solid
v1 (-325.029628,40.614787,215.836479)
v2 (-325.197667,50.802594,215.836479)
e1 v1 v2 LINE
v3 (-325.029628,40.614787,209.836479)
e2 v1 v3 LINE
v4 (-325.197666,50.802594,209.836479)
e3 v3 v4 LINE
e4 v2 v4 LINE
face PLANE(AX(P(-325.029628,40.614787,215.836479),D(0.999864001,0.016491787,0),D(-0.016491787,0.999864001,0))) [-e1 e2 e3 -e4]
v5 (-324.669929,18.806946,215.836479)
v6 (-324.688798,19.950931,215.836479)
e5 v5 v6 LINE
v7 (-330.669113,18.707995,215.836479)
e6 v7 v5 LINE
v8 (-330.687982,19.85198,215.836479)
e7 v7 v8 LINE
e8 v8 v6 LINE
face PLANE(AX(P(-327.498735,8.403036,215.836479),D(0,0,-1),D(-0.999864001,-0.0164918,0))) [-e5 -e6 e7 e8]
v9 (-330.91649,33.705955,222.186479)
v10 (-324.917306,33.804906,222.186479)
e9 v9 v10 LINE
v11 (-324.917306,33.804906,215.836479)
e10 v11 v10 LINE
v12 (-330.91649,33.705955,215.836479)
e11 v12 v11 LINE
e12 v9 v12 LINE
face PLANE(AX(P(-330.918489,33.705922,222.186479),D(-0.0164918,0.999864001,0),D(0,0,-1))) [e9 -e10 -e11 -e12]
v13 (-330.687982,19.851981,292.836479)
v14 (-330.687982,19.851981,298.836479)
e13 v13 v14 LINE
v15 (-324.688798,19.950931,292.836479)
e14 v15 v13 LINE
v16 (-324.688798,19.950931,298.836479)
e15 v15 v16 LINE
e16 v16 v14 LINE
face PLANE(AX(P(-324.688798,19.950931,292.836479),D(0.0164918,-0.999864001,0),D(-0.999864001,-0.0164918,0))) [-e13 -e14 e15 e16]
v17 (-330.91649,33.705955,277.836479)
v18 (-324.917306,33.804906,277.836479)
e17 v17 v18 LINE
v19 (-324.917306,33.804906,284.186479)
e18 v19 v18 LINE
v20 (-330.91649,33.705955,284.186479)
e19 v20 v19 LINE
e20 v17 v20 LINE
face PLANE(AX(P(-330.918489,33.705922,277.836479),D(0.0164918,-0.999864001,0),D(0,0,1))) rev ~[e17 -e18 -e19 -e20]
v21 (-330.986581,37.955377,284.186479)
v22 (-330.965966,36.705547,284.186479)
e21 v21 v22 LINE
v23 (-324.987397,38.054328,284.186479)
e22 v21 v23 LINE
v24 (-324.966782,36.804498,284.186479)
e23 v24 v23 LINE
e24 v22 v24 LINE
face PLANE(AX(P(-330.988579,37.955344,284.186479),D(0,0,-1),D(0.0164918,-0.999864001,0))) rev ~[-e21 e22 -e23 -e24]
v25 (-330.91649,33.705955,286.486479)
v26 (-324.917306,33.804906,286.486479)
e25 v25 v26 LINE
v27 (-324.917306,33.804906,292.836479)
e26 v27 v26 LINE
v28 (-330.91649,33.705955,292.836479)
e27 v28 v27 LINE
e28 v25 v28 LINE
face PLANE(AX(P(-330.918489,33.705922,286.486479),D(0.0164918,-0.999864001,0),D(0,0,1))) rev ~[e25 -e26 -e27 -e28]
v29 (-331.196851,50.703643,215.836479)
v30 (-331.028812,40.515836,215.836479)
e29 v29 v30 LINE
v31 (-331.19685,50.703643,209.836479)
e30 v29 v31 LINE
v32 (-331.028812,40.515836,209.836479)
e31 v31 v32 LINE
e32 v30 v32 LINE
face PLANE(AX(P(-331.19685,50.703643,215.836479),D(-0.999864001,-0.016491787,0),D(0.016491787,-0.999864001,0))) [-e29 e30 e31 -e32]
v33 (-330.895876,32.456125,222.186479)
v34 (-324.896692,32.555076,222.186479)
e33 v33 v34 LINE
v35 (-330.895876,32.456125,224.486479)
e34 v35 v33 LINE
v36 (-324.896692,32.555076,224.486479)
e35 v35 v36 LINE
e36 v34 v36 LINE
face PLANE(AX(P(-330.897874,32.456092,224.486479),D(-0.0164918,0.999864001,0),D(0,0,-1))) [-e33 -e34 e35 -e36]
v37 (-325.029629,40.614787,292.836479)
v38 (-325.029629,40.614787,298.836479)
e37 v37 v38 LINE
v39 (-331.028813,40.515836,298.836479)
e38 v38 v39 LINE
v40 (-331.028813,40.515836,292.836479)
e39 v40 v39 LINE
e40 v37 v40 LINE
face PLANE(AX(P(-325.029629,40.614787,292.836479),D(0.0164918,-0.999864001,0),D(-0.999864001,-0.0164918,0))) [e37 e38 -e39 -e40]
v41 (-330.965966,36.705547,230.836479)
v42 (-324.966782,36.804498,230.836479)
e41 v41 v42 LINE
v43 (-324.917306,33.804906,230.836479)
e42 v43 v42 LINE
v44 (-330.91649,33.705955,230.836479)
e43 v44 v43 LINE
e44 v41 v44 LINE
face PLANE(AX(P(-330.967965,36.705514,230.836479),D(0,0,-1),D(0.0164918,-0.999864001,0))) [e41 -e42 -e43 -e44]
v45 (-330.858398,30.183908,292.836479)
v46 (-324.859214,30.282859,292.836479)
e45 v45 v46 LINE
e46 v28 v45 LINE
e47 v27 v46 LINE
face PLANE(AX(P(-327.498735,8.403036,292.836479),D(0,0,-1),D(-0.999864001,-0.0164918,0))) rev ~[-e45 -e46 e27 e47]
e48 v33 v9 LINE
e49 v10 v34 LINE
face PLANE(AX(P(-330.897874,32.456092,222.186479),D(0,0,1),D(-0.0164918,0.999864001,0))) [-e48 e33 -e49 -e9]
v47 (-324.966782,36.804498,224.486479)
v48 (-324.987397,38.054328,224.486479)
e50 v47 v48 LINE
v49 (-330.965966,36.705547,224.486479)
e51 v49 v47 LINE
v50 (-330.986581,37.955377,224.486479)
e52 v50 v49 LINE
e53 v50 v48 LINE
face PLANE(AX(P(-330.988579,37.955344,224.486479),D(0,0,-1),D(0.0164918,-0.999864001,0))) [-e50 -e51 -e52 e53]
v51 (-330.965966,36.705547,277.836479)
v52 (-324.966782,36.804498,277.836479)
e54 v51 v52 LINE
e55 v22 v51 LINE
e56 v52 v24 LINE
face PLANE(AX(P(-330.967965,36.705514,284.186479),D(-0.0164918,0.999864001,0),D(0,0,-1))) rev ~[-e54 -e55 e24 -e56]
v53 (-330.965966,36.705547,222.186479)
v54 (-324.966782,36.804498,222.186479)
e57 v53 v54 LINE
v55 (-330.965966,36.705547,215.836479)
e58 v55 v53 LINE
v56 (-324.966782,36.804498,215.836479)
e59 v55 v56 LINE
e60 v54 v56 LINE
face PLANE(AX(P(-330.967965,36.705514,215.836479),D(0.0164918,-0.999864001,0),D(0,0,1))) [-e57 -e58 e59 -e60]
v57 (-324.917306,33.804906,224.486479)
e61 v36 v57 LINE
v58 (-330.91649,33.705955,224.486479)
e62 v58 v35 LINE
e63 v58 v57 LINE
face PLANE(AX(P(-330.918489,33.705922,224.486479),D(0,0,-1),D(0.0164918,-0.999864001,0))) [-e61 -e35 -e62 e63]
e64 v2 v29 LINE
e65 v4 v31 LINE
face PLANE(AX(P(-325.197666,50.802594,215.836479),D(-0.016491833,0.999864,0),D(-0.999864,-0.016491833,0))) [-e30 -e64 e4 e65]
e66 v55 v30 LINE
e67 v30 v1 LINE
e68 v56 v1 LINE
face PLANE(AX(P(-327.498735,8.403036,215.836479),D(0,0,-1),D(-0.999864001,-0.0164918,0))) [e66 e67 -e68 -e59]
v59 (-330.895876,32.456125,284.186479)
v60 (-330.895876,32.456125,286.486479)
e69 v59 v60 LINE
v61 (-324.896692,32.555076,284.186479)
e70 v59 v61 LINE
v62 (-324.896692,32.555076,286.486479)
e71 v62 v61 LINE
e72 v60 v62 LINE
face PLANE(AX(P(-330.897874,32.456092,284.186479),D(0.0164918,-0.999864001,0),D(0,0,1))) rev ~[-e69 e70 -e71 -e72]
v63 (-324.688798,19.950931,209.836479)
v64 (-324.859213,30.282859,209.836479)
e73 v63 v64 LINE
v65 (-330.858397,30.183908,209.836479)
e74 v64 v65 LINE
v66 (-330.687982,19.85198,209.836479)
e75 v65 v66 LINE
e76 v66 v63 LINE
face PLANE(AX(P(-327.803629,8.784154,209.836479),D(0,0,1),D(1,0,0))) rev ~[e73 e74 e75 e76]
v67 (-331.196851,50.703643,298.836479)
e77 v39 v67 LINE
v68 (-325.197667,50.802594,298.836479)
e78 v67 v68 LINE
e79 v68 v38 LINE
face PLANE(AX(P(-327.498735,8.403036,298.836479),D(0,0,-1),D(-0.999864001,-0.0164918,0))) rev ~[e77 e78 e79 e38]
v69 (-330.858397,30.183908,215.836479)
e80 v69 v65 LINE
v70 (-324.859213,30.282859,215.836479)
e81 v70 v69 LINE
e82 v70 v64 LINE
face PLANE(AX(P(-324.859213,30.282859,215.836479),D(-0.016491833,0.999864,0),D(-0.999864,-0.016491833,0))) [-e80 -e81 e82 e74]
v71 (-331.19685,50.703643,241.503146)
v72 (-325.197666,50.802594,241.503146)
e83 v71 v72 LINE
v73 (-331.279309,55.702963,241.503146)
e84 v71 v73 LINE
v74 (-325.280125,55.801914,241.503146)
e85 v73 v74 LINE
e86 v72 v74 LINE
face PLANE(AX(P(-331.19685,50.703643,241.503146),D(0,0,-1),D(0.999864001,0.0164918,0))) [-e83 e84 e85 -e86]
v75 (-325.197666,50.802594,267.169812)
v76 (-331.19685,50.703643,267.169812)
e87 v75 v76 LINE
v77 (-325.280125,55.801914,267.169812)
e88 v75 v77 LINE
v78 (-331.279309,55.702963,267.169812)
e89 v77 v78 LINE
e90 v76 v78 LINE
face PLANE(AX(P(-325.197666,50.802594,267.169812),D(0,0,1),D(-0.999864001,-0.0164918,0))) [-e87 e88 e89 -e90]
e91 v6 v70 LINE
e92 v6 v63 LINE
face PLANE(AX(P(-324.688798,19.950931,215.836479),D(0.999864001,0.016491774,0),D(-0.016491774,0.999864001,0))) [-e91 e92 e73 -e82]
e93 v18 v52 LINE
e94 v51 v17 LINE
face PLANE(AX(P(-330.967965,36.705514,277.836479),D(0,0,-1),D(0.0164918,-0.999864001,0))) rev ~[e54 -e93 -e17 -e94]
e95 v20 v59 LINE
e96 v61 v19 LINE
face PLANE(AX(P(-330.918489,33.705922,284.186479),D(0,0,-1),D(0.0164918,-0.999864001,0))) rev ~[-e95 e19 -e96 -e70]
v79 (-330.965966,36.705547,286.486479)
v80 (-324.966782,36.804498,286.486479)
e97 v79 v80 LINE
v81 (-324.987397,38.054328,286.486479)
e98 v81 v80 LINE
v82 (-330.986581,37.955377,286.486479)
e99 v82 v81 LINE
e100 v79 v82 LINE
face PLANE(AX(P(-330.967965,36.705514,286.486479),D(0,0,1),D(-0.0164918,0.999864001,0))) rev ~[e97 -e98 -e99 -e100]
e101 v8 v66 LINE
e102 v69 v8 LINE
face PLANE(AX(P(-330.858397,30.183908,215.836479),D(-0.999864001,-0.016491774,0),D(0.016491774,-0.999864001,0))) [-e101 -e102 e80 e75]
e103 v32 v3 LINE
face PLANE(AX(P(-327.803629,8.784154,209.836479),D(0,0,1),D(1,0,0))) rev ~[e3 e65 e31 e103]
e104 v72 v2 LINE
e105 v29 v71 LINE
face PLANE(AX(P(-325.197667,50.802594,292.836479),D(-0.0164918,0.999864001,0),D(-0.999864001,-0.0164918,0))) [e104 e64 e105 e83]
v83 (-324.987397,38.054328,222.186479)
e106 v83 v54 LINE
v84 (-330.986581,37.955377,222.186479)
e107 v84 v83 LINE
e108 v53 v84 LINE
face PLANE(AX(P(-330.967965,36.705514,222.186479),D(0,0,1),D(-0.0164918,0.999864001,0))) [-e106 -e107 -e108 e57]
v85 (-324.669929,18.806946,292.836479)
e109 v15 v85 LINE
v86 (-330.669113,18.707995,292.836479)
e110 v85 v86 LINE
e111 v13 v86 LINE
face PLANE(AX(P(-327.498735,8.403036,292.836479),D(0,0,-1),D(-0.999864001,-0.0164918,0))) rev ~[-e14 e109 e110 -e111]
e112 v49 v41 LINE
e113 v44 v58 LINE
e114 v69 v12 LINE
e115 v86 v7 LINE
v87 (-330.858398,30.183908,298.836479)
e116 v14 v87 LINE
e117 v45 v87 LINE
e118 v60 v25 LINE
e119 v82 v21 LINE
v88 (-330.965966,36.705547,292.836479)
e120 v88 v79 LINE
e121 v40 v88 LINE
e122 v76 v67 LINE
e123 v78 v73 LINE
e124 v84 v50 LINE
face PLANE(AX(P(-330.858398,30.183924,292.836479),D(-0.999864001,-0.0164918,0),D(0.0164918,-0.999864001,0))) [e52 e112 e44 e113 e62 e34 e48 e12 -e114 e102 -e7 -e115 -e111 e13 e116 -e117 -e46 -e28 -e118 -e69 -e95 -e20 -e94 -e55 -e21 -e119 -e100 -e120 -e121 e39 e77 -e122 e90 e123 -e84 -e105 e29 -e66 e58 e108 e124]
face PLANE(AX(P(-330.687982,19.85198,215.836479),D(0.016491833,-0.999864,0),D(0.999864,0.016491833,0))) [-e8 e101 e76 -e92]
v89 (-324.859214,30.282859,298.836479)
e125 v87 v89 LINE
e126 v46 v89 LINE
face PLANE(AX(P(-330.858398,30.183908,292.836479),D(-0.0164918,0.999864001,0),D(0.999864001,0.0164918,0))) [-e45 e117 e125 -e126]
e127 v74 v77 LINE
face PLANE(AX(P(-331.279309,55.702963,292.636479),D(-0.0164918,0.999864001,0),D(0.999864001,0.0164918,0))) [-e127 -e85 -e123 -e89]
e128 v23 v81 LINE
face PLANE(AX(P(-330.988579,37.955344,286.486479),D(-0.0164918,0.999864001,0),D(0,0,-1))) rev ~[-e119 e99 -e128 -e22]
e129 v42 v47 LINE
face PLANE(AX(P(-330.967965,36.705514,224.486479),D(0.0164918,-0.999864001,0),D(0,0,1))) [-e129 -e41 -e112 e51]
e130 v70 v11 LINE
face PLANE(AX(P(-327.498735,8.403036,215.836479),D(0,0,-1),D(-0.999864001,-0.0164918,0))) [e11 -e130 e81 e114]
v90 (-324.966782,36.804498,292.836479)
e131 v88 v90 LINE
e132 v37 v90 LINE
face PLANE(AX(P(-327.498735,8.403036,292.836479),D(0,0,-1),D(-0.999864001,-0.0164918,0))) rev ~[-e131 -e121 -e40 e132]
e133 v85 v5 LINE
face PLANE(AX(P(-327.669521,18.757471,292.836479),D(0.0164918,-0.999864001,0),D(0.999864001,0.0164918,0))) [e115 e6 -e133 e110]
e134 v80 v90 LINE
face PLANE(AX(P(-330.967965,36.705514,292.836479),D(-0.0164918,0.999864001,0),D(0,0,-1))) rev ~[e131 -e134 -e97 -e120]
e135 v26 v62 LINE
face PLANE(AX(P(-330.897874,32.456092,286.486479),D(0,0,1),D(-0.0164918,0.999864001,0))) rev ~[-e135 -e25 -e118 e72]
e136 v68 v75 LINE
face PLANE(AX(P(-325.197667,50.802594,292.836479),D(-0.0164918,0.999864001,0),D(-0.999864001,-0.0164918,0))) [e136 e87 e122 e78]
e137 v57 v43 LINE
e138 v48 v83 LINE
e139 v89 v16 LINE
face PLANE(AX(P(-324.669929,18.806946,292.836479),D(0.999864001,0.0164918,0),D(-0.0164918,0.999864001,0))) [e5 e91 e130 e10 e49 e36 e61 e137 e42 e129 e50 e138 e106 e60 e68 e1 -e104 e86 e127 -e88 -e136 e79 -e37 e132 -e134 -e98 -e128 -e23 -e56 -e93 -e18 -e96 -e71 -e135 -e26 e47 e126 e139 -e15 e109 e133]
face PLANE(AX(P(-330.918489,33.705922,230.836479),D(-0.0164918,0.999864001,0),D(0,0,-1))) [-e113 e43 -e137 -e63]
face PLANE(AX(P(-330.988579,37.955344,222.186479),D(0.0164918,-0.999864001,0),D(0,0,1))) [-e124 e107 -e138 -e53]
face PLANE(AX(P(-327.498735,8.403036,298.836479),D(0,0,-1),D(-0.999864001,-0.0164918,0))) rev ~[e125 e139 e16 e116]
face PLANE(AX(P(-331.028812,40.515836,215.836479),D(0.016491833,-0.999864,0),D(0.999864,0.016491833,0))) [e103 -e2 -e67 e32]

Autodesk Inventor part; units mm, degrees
ref_plane "РабПлоскость1" through (-327.803629, 8.784154, 215.836479) normal (0, 0, 1) x (1, 0, 0)
sketch "Эскиз1" plane through (-327.803629, 8.784154, 215.836479) normal (0, 0, 1) x (1, 0, 0)
  line L0 (3.114831, 11.166777) -> (2.944416, 21.498705)
  line L1 (2.944416, 21.498705) -> (-3.054768, 21.399754)
  line L2 (-3.054768, 21.399754) -> (-2.884353, 11.067826)
  line L3 (-2.884353, 11.067826) -> (3.114831, 11.166777)
  line L4 (-3.393221, 41.919489) -> (-3.225183, 31.731682)
  line L5 (2.774001, 31.830633) -> (2.605963, 42.01844)
  line L6 (-3.225183, 31.731682) -> (2.774001, 31.830633)
  line L7 (2.605963, 42.01844) -> (-3.393221, 41.919489)
  line L8 (2.774001, 31.830633) -> (2.605963, 42.01844) construction
  line L9 (-3.393221, 41.919489) -> (-3.225183, 31.731682) construction
  line L10 (3.114831, 11.166777) -> (2.944416, 21.498705) construction
  line L11 (-3.054768, 21.399754) -> (-2.884353, 11.067826) construction
  line L12 (6.149374, 48.077701) -> (19.433282, 48.296806) construction
  line L13 (2.605963, 42.01844) -> (6.248325, 42.078517) construction
  point P0 (327.803629, -8.784154)
  dimension "d16" = 6
extrude "Выдавливание1" add sketch "Эскиз1" against normal blind 6
ref_plane "РабПлоскость2" through (-327.498735, 8.403036, 292.836479) normal (0, 0, -1) x (-0.999864, -0.0164918, 0)
sketch "Эскиз2" plane through (-327.498735, 8.403036, 292.836479) normal (0, 0, -1) x (-0.999864, -0.0164918, 0)
  line L0 (-3, 21.833317) -> (3, 21.833317)
  line L1 (3, 21.833317) -> (3, 11.499984)
  line L2 (3, 11.5) -> (-3, 11.5)
  line L3 (-3, 11.499984) -> (-3, 21.833317)
  line L4 (3, 32.16665) -> (-3, 32.16665)
  line L5 (-3, 32.16665) -> (-3, 42.355843)
  line L6 (-3, 42.5) -> (3, 42.5)
  line L7 (3, 42.355843) -> (3, 32.16665)
  line L8 (-3, 11.499984) -> (-3, 21.833317) construction
  line L9 (3, 21.833317) -> (3, 11.499984) construction
  line L10 (-3, 32.16665) -> (-3, 42.355843) construction
  line L11 (3, 42.355843) -> (3, 32.16665) construction
  point P0 (-327.315615, -13.802923)
sketch "Эскиз2 outline for Выдавливание2" plane through (-327.498735, 8.403036, 292.836479) normal (0, 0, -1) x (-0.999864, -0.0164918, 0)
  line L0 (3, 32.16665) -> (3, 42.355843)
  line L1 (-3, 32.16665) -> (3, 32.16665)
  line L2 (-3, 42.355843) -> (-3, 32.16665)
  line L3 (3, 42.355843) -> (-3, 42.355843)
  line L4 (-3, 21.833317) -> (-3, 11.499984)
  line L5 (3, 21.833317) -> (-3, 21.833317)
  line L6 (3, 11.499984) -> (3, 21.833317)
  line L7 (-3, 11.499984) -> (3, 11.499984)
extrude "Выдавливание2" add sketch "Эскиз2 outline for Выдавливание2" against normal blind 6
sketch "Эскиз3" plane through (-327.498735, 8.403036, 292.836479) normal (0, 0, -1) x (-0.999864, -0.0164918, 0)
  circle A0 centre (0, -7.644157) radius 18
  line L0 (6.642857, 42.355843) -> (3, 42.355843)
  line L1 (-3, 32.166667) -> (-3, 21.833333)
  line L2 (-3, 21.833333) -> (3, 21.833333)
  line L3 (3, 21.833333) -> (3, 32.166667)
  line L4 (3, 32.166667) -> (-3, 32.166667)
  line L5 (-3, 42.355843) -> (3, 42.355843)
  line L6 (3, 42.355843) -> (3, 10.355843)
  line L7 (3, 10.355843) -> (-3, 10.355843)
  line L8 (-3, 10.355843) -> (-3, 42.355843)
  point P0 (-327.315615, -13.802923)
  point P1 (-3, 21.833333)
  point P2 (3, 21.833333)
  point P3 (3, 42.355843)
extrude "Выдавливание3" add sketch "Эскиз3" along normal up to surface (77 mm away) contours L7 L8 L2 L6 | L2 L1 L4 L3 | L4 L8 L5 L6
sketch "Эскиз4" plane through (-331.19685, 50.703643, 209.836479) normal (-0.999864, -0.0164918, 0) x (0, 0, 1)
  line L0 (0, -14) -> (6, -14) construction
  line L1 (0, -17) -> (6, -17) construction
  line L2 (6, -17) -> (6, -14)
  line L3 (6, -14) -> (12.35, -14)
  line L4 (12.35, -14) -> (12.35, -12.75)
  line L5 (12.35, -12.75) -> (14.65, -12.75)
  line L6 (14.65, -12.75) -> (14.65, -14)
  line L7 (14.65, -14) -> (21, -14)
  line L8 (21, -14) -> (21, -17)
  line L9 (21, -17) -> (14.65, -17)
  line L10 (14.65, -17) -> (14.65, -18.25)
  line L11 (14.65, -18.25) -> (12.35, -18.25)
  line L12 (12.35, -18.25) -> (12.35, -17)
  line L13 (12.35, -17) -> (6, -17)
  line L14 (0, -20.522506) -> (0, -30.855843) construction
  line L15 (89, -10.189193) -> (89, 0) construction
  line L16 (0, -30.855843) -> (89, 0) construction
  line L17 (44.5, 0) -> (44.5, -30.855843) construction
  line L18 (89, -14) -> (83, -14) construction
  line L19 (89, -17) -> (83, -17) construction
  line L20 (83, -17) -> (83, -14)
  line L21 (83, -14) -> (76.65, -14)
  line L22 (76.65, -14) -> (76.65, -12.75)
  line L23 (76.65, -12.75) -> (74.35, -12.75)
  line L24 (74.35, -12.75) -> (74.35, -14)
  line L25 (74.35, -14) -> (68, -14)
  line L26 (68, -14) -> (68, -17)
  line L27 (68, -17) -> (74.35, -17)
  line L28 (74.35, -17) -> (74.35, -18.25)
  line L29 (74.35, -18.25) -> (76.65, -18.25)
  line L30 (76.65, -18.25) -> (76.65, -17)
  line L31 (76.65, -17) -> (83, -17)
  point P0 (-209.836479, -56.158766)
  point P1 (44.5, -15.427922)
  dimension "d9" = 2.3
  dimension "d10" = 5.5
  dimension "d11" = 15
extrude "Выдавливание4" cut sketch "Эскиз4" against normal blind 6
ref_plane "РабПлоскость3" through (-672.954973, 50.067364, -86.377936) normal (-0.0164918, 0.999864, 0) x (0, 0, 1)
sketch "Эскиз5" plane through (-331.19685, 50.703643, 292.636479) normal (-0.0164918, 0.999864, 0) x (0.999864, 0.0164918, 0)
  line L0 (6, 51.133333) -> (6, 25.466667)
  line L1 (0, 51.133333) -> (6, 51.133333)
  line L2 (0, 25.466667) -> (0, 51.133333)
  line L3 (6, 25.466667) -> (0, 25.466667)
  point P0 (330.315615, 292.636479)
extrude "Выдавливание5" add sketch "Эскиз5" along normal up to surface (5 mm away)
equation "\"d1\" = d0"
equation "\"d3\" = d0"
equation "\"d7\" = d0"
equation "\"d12\" = d3"
equation "\"d0\" = d16"
properties part number "motor1"
